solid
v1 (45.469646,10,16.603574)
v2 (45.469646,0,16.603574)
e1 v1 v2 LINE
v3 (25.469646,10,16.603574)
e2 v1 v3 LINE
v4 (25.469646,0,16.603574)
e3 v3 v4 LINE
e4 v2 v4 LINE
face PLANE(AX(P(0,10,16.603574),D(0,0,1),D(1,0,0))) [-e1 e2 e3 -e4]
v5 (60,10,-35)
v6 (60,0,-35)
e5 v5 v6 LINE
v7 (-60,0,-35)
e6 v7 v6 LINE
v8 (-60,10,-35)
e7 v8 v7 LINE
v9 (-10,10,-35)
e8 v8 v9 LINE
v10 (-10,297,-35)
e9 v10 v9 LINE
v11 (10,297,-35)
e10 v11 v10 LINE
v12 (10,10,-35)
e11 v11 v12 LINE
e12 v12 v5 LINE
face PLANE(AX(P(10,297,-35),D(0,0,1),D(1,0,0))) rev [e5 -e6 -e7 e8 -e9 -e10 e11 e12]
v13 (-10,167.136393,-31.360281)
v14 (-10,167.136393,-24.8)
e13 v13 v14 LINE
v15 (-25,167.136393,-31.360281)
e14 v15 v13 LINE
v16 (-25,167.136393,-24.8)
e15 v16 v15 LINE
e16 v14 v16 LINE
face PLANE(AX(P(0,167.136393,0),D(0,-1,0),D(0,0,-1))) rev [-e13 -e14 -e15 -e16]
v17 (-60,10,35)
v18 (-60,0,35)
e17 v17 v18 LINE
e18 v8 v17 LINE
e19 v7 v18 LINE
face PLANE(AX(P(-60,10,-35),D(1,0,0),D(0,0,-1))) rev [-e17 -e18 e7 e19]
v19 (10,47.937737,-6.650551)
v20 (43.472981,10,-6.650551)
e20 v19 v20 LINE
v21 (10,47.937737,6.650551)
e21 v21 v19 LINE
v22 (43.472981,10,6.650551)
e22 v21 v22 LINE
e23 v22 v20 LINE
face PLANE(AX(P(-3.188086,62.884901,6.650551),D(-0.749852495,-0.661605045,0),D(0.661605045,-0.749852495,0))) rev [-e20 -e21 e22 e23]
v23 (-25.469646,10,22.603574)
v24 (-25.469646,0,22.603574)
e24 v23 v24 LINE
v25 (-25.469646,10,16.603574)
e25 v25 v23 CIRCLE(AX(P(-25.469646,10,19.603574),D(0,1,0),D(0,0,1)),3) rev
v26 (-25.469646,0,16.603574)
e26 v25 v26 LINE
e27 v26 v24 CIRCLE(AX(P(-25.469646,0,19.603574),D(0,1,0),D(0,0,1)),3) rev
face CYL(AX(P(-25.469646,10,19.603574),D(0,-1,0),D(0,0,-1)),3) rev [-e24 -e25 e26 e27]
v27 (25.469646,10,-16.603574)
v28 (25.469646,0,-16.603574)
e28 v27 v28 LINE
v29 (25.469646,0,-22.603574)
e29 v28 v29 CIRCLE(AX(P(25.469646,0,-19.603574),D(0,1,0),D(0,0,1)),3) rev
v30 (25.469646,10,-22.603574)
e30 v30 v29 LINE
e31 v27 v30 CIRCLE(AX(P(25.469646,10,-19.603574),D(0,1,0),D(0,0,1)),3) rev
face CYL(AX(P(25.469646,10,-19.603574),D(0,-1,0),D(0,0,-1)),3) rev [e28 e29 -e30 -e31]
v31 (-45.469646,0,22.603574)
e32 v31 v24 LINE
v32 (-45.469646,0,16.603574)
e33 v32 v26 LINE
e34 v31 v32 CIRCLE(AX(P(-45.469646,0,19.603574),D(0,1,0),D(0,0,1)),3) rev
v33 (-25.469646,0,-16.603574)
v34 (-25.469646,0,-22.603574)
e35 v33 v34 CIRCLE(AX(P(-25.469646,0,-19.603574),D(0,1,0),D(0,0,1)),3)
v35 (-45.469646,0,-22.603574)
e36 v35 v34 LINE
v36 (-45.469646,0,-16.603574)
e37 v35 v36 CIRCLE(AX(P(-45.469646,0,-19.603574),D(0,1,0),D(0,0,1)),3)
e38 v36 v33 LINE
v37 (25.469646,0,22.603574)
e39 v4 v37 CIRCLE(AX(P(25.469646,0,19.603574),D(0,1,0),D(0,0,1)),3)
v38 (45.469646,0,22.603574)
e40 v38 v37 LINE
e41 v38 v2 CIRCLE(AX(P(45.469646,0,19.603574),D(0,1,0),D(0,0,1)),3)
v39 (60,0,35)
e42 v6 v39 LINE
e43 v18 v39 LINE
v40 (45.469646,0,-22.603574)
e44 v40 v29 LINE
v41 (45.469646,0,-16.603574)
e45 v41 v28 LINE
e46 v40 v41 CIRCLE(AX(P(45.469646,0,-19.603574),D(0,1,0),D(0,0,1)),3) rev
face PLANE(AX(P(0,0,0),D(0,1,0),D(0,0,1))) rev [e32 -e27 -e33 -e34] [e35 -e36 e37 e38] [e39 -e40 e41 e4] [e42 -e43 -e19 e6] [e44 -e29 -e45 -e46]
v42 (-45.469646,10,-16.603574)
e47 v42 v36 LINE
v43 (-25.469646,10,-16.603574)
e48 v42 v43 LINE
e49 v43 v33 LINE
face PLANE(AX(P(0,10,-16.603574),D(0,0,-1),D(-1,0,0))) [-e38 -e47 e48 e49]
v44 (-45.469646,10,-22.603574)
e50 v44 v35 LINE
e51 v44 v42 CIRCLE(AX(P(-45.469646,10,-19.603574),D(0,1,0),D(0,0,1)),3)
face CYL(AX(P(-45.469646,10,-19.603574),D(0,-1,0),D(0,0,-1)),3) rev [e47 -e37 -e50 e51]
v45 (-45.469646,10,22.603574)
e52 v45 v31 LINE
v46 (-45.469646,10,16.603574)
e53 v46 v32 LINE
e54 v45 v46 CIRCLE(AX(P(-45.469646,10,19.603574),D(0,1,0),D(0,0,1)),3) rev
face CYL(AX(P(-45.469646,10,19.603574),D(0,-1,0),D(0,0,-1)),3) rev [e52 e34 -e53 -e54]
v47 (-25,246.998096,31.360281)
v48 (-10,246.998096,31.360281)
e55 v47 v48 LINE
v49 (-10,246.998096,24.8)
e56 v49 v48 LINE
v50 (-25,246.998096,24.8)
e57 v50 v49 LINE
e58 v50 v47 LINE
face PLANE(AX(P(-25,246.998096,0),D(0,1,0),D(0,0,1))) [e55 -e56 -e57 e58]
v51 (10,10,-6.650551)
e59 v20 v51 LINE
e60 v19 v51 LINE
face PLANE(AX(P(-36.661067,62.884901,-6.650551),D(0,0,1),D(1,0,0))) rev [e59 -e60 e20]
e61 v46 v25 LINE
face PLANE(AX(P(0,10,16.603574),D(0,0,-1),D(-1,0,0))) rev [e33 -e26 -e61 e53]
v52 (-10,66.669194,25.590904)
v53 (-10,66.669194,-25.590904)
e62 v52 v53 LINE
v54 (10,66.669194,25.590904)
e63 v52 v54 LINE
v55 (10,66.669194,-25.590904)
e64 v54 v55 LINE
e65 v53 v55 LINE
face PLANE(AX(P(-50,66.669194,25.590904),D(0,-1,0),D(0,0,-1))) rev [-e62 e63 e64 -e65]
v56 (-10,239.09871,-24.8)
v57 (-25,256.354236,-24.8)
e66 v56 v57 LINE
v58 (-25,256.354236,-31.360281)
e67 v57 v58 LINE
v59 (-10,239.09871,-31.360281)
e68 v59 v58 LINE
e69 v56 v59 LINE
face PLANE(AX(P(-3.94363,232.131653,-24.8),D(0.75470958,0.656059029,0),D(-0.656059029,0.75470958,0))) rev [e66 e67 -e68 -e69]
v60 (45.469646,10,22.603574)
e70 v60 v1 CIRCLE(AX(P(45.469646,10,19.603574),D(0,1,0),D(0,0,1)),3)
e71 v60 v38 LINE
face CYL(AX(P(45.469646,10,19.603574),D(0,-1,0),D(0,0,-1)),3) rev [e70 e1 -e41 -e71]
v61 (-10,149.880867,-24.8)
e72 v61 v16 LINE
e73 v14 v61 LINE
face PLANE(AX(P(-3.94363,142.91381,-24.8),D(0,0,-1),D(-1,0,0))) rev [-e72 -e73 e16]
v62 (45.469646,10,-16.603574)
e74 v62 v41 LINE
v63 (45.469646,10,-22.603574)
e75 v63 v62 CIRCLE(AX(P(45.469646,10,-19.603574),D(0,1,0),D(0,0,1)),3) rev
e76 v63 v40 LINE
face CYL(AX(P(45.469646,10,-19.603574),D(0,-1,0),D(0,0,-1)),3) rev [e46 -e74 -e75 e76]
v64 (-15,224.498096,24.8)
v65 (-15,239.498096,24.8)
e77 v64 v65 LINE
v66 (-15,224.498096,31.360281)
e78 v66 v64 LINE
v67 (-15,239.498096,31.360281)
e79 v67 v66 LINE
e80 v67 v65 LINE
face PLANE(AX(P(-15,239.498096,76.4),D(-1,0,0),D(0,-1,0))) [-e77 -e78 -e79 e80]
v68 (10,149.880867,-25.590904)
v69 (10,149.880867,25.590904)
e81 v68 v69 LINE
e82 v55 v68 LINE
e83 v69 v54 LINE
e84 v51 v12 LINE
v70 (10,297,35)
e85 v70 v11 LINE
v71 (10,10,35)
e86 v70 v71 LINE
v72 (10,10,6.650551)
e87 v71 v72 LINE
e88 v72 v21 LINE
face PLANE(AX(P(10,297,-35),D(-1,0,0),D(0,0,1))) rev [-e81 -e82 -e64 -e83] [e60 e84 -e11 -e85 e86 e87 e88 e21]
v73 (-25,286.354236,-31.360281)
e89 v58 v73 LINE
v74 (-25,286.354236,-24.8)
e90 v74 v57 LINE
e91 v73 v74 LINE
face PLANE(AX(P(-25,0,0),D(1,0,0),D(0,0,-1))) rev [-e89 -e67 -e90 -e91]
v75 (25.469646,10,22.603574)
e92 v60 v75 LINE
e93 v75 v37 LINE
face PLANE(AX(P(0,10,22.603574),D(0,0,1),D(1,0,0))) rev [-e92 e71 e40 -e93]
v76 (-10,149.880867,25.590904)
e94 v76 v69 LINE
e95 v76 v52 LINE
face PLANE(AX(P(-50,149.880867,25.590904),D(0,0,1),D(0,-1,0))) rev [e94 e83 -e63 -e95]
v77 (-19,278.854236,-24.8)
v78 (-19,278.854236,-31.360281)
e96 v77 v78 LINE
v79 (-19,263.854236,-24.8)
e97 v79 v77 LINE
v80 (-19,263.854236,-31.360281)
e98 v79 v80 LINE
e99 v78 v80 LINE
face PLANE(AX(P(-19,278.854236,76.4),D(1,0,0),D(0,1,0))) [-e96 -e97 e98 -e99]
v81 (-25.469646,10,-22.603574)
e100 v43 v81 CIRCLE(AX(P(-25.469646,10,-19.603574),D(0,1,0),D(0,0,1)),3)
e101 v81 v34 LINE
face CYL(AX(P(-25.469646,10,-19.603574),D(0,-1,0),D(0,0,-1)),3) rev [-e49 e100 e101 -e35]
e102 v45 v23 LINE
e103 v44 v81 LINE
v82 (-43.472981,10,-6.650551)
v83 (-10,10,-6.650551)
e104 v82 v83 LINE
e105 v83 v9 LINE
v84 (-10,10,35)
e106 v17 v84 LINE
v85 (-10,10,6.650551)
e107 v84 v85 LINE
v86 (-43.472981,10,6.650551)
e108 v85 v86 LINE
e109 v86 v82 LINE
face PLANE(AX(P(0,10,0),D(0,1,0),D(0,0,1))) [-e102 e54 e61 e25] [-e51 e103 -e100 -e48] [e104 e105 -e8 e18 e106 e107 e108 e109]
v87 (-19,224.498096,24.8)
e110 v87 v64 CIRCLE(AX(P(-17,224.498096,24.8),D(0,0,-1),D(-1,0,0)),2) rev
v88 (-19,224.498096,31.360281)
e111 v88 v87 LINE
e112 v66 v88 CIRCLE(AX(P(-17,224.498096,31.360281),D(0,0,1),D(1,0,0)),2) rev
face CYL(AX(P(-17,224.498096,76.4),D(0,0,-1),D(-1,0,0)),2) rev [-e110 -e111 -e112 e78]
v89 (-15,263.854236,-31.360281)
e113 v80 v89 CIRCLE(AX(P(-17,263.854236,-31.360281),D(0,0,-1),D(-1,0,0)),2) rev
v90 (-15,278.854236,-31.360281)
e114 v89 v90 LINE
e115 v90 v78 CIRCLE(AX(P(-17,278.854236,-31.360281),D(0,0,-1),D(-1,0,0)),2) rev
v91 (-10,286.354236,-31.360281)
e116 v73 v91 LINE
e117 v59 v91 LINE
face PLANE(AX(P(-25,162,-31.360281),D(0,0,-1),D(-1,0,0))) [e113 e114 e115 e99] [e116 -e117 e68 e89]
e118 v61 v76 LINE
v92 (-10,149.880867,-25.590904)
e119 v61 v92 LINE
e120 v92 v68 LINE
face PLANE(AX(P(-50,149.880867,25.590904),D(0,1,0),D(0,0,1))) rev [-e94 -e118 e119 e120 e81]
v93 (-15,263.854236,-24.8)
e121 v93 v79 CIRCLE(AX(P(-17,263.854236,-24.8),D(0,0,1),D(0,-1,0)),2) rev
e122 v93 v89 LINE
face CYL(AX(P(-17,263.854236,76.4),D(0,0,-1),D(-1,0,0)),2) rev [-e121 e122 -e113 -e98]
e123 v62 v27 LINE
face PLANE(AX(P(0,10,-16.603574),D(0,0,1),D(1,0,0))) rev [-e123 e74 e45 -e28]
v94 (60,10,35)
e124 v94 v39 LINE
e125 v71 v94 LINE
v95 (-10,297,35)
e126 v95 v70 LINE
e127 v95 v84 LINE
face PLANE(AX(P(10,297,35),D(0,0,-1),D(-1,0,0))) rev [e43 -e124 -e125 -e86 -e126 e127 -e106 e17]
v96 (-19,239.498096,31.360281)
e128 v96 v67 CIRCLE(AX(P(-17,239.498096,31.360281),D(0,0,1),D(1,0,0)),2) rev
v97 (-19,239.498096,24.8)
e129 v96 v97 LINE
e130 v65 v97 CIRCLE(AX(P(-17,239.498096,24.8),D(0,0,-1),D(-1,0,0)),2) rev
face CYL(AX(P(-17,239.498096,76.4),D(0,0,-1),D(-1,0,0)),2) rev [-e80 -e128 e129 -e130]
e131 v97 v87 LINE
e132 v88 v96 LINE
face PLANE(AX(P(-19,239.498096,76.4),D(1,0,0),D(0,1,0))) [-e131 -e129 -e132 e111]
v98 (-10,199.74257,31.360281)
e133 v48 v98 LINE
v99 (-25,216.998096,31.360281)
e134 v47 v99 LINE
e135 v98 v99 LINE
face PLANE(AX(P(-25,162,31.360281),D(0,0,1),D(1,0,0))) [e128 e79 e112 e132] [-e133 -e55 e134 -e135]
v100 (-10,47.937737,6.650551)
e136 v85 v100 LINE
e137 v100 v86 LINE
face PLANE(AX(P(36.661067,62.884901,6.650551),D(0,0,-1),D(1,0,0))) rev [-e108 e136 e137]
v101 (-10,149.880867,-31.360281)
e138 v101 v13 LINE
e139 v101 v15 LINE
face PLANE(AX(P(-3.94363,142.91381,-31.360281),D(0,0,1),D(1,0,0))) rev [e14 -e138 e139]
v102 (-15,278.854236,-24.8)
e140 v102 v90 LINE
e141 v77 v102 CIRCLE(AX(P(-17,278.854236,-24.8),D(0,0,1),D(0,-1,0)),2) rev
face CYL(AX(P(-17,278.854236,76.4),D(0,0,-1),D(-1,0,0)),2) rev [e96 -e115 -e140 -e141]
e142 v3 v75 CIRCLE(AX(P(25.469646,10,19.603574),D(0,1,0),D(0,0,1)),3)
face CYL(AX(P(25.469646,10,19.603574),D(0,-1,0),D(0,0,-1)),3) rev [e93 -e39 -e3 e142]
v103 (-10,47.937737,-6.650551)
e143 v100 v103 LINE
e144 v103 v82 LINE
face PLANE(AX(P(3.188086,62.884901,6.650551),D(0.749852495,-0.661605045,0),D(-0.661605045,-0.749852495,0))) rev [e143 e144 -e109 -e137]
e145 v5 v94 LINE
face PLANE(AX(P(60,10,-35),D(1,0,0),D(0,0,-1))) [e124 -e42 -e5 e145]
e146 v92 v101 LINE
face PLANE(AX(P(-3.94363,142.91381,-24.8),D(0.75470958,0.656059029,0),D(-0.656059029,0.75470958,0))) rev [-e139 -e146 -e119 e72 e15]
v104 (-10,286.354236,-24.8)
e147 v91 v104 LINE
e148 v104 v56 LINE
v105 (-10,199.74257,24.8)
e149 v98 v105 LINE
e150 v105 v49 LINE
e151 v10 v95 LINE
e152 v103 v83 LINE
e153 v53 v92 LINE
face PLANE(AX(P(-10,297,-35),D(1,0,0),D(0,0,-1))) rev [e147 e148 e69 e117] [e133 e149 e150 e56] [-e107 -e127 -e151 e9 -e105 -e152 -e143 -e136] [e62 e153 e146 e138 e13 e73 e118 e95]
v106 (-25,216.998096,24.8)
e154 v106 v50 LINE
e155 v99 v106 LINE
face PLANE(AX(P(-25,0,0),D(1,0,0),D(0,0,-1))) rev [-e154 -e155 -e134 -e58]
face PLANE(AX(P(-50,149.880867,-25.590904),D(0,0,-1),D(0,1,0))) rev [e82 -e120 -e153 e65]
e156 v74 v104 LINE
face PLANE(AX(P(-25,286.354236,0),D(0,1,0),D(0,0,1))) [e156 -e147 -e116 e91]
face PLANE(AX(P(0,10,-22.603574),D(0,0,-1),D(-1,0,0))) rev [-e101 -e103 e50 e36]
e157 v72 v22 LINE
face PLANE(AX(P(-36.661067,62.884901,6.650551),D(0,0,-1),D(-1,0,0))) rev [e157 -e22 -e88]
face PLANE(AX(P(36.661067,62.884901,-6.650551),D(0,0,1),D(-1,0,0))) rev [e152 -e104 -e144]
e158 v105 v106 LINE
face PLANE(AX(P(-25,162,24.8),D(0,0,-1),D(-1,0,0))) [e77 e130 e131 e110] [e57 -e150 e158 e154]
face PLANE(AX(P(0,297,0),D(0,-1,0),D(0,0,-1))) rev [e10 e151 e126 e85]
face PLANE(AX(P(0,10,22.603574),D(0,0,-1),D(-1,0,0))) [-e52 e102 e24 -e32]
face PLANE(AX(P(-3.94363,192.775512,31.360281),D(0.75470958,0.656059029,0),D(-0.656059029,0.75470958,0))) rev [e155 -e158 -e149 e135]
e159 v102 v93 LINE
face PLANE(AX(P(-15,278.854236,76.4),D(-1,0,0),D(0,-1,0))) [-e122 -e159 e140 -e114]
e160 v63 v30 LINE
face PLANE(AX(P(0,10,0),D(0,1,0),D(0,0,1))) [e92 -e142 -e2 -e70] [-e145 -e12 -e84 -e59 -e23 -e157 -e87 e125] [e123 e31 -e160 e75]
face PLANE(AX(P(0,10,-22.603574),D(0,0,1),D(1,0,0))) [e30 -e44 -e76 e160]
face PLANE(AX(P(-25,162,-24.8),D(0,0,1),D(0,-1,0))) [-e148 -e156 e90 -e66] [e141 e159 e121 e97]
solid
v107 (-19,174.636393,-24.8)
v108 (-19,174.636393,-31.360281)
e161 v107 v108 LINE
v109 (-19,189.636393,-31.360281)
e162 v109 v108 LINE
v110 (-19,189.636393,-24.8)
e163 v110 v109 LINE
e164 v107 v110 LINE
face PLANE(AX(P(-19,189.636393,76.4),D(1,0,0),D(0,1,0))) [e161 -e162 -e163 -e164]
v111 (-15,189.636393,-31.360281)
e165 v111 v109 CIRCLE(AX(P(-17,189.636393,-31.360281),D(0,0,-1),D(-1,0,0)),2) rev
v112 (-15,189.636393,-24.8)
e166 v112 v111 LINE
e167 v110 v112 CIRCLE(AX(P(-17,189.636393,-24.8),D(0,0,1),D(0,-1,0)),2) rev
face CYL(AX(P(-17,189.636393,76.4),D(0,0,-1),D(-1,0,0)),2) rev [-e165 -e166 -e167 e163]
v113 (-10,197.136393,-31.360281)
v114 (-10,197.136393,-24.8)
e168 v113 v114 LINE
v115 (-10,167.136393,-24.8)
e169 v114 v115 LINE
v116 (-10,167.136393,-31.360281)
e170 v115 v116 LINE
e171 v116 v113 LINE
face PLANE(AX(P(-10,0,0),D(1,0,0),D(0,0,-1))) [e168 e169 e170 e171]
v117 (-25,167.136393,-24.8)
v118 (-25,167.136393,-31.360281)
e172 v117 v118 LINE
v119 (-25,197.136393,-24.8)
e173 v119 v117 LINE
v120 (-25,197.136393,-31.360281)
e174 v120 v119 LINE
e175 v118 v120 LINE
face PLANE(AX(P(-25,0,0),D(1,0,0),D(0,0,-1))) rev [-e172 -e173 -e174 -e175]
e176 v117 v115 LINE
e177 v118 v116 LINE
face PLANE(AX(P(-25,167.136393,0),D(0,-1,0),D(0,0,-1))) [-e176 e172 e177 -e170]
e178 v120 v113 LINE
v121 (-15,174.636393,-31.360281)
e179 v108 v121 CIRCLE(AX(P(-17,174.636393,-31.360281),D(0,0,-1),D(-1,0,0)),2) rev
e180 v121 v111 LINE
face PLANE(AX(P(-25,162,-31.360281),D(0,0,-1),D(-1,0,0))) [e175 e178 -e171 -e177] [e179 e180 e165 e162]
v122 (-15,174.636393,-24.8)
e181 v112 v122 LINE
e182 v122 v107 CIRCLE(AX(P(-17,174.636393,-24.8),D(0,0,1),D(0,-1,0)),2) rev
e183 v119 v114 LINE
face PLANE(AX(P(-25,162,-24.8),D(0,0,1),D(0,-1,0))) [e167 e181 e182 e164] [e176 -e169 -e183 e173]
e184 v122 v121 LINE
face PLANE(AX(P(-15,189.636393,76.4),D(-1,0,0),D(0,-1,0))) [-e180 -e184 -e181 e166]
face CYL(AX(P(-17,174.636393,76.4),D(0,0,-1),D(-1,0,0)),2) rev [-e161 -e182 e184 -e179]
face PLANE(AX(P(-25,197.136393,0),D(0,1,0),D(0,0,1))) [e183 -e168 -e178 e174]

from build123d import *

# Parameters (mm, degrees)
SKETCH1_W               = 120
SKETCH1_H               = 70
BOSS_EXTRUDE1_DEPTH     = 10
SKETCH1_3_W             = 20
SKETCH1_3_H             = 70
BOSS_EXTRUDE2_DEPTH     = 162
BOSS_EXTRUDE3_START     = -20
SKETCH2_W               = 6.560281302
SKETCH2_H               = 30
BOSS_EXTRUDE3_DEPTH     = 15
BOSS_EXTRUDE3_2_DEPTH   = 15
BOSS_EXTRUDE3_3_DEPTH   = 15
CUT_EXTRUDE3_DEPTH      = 101.2
CUT_EXTRUDE3_DEPTH_BACK = 127.2
SKETCH7_W               = 20
SKETCH7_H               = 70
BOSS_EXTRUDE4_DEPTH     = 135
SKETCH12_W              = 15
SKETCH12_H              = 6.560281302
BOSS_EXTRUDE6_DEPTH     = 26.31701322
BOSS_EXTRUDE7_START     = -31.360281302
BOSS_EXTRUDE7_DEPTH     = 6.560281302
BOSS_EXTRUDE8_START     = -31.360281302
BOSS_EXTRUDE8_DEPTH     = 6.560281302
SKETCH3_W               = 51.18180782
SKETCH3_H               = 83.211673014
CUT_EXTRUDE1_DEPTH      = 60
BOSS_EXTRUDE9_START     = -6.650550524
BOSS_EXTRUDE9_DEPTH     = 13.301101048


# Read off the part's stored shape, not the designer's step: Boss-Extrude7, Boss-Extrude8, Boss-Extrude9
with BuildPart() as part:
    # Sketch1 → Boss-Extrude1 (new body)
    with BuildSketch(Plane(origin=(0, 0, 0), x_dir=(1, 0, 0), z_dir=(0, 1, 0))):
        Rectangle(SKETCH1_W, SKETCH1_H)
        with BuildLine():
            Line((-45.469645663, 22.603573917), (-25.469645663, 22.603573917))
            ThreePointArc((-25.469645663, 22.603573917), (-22.469645663, 19.603573917), (-25.469645663, 16.603573917))
            Line((-25.469645663, 16.603573917), (-45.469645663, 16.603573917))
            ThreePointArc((-45.469645663, 16.603573917), (-48.469645663, 19.603573917), (-45.469645663, 22.603573917))
        make_face(mode=Mode.SUBTRACT)
        with BuildLine():
            Line((45.469645663, 22.603573917), (25.469645663, 22.603573917))
            ThreePointArc((25.469645663, 22.603573917), (22.469645663, 19.603573917), (25.469645663, 16.603573917))
            Line((25.469645663, 16.603573917), (45.469645663, 16.603573917))
            ThreePointArc((45.469645663, 16.603573917), (48.469645663, 19.603573917), (45.469645663, 22.603573917))
        make_face(mode=Mode.SUBTRACT)
        with BuildLine():
            Line((45.469645663, -22.603573917), (25.469645663, -22.603573917))
            ThreePointArc((25.469645663, -22.603573917), (22.469645663, -19.603573917), (25.469645663, -16.603573917))
            Line((25.469645663, -16.603573917), (45.469645663, -16.603573917))
            ThreePointArc((45.469645663, -16.603573917), (48.469645663, -19.603573917), (45.469645663, -22.603573917))
        make_face(mode=Mode.SUBTRACT)
        with BuildLine():
            Line((-45.469645663, -22.603573917), (-25.469645663, -22.603573917))
            ThreePointArc((-25.469645663, -22.603573917), (-22.469645663, -19.603573917), (-25.469645663, -16.603573917))
            Line((-25.469645663, -16.603573917), (-45.469645663, -16.603573917))
            ThreePointArc((-45.469645663, -16.603573917), (-48.469645663, -19.603573917), (-45.469645663, -22.603573917))
        make_face(mode=Mode.SUBTRACT)
    extrude(amount=BOSS_EXTRUDE1_DEPTH)

    # Sketch1<3> → Boss-Extrude2 (add)
    with BuildSketch(Plane(origin=(0, 0, 0), x_dir=(1, 0, 0), z_dir=(0, 1, 0))):
        Rectangle(SKETCH1_3_W, SKETCH1_3_H)
    extrude(amount=BOSS_EXTRUDE2_DEPTH)


with BuildPart() as body_2:
    # Sketch2 → Boss-Extrude3 (new body)
    with BuildSketch(Plane(origin=(10, 0, 0), x_dir=(0, 0, -1), z_dir=(1, 0, 0)).offset(BOSS_EXTRUDE3_START)):
        with Locations((-28.080140651, 231.998095635)):
            Rectangle(SKETCH2_W, SKETCH2_H)
    extrude(amount=-BOSS_EXTRUDE3_DEPTH)


with BuildPart() as body_3:
    # Sketch2 → Boss-Extrude3 2 (new body)
    with BuildSketch(Plane(origin=(10, 0, 0), x_dir=(0, 0, -1), z_dir=(1, 0, 0)).offset(BOSS_EXTRUDE3_START)):
        with Locations((28.080140651, 182.13639327)):
            Rectangle(SKETCH2_W, SKETCH2_H)
    extrude(amount=-BOSS_EXTRUDE3_2_DEPTH)


with BuildPart() as body_4:
    # Sketch2 → Boss-Extrude3 3 (new body)
    with BuildSketch(Plane(origin=(10, 0, 0), x_dir=(0, 0, -1), z_dir=(1, 0, 0)).offset(BOSS_EXTRUDE3_START)):
        with Locations((28.080140651, 271.354236176)):
            Rectangle(SKETCH2_W, SKETCH2_H)
    extrude(amount=-BOSS_EXTRUDE3_3_DEPTH)


with BuildPart() as cut_extrude3_tool:
    # Sketch5 → Cut-Extrude3 (new, two sides: drawn at the far end of the back side and taken through both)
    with BuildSketch(Plane.XY.offset(-24.8).offset(-CUT_EXTRUDE3_DEPTH_BACK)):
        with BuildLine():
            Line((-15, 239.498095635), (-15, 224.498095635))
            ThreePointArc((-15, 224.498095635), (-17, 222.498095635), (-19, 224.498095635))
            Line((-19, 224.498095635), (-19, 239.498095635))
            ThreePointArc((-19, 239.498095635), (-17, 241.498095635), (-15, 239.498095635))
        make_face()
        with BuildLine():
            Line((-15, 189.63639327), (-15, 174.63639327))
            ThreePointArc((-15, 174.63639327), (-17, 172.63639327), (-19, 174.63639327))
            Line((-19, 174.63639327), (-19, 189.63639327))
            ThreePointArc((-19, 189.63639327), (-17, 191.63639327), (-15, 189.63639327))
        make_face()
        with BuildLine():
            Line((-15, 278.854236176), (-15, 263.854236176))
            ThreePointArc((-15, 263.854236176), (-17, 261.854236176), (-19, 263.854236176))
            Line((-19, 263.854236176), (-19, 278.854236176))
            ThreePointArc((-19, 278.854236176), (-17, 280.854236176), (-15, 278.854236176))
        make_face()
    extrude(amount=CUT_EXTRUDE3_DEPTH + CUT_EXTRUDE3_DEPTH_BACK)


with BuildPart() as body_2_1:
    add(body_2.part)

    # Cut-Extrude3: cut by cut_extrude3_tool
    add(cut_extrude3_tool.part, mode=Mode.SUBTRACT)



with BuildPart() as body_3_1:
    add(body_3.part)

    # Cut-Extrude3: cut by cut_extrude3_tool
    add(cut_extrude3_tool.part, mode=Mode.SUBTRACT)


with BuildPart() as body_4_1:
    add(body_4.part)

    # Cut-Extrude3: cut by cut_extrude3_tool
    add(cut_extrude3_tool.part, mode=Mode.SUBTRACT)


with BuildPart() as body_2_2:
    add(body_2_1.part)

    add(body_4_1.part)  # Boss-Extrude4 merges body 4

    add(part.part)  # Boss-Extrude4 merges part
    # Sketch7 → Boss-Extrude4 (add)
    with BuildSketch(Plane(origin=(0, 162, 0), x_dir=(1, 0, 0), z_dir=(0, 1, 0))):
        Rectangle(SKETCH7_W, SKETCH7_H)
    extrude(amount=BOSS_EXTRUDE4_DEPTH)

    # Sketch12 → Boss-Extrude6 (add, along a direction that is not the sketch's normal)
    with BuildSketch(Plane.XZ.offset(-216.998095635)):
        with Locations((-17.5, 28.080140651)):
            Rectangle(SKETCH12_W, SKETCH12_H)
    extrude(amount=BOSS_EXTRUDE6_DEPTH, dir=(0.6560590289905114, -0.7547095802227685, 0))

    # Boss-Extrude7 outline → Boss-Extrude7 (add)
    with BuildSketch(Plane.XY.offset(BOSS_EXTRUDE7_START)):
        Polygon((-25, 256.354236176), (-10, 239.098710067), (-10, 256.354236176), align=None)
    extrude(amount=BOSS_EXTRUDE7_DEPTH)

    # Boss-Extrude8 outline → Boss-Extrude8 (add)
    with BuildSketch(Plane.XY.offset(BOSS_EXTRUDE8_START)):
        Polygon((-10, 167.13639327), (-25, 167.13639327), (-10, 149.880867162), align=None)
    extrude(amount=BOSS_EXTRUDE8_DEPTH)

    # Sketch3 → Cut-Extrude1 (cut)
    with BuildSketch(Plane(origin=(10, 0, 0), x_dir=(0, 0, -1), z_dir=(1, 0, 0))):
        with Locations((0, 108.275030655)):
            Rectangle(SKETCH3_W, SKETCH3_H)
    extrude(amount=-CUT_EXTRUDE1_DEPTH, mode=Mode.SUBTRACT)

    # Boss-Extrude9 outline → Boss-Extrude9 (add)
    with BuildSketch(Plane.XY.offset(BOSS_EXTRUDE9_START)):
        Polygon((43.472980585, 10), (10, 47.93773671), (10, 10), align=None)
    boss_extrude9 = extrude(amount=BOSS_EXTRUDE9_DEPTH)

    # Mirror1: Boss-Extrude9 across plane
    add(boss_extrude9.mirror(Plane(origin=(0, 0, 0), x_dir=(0, 0, 1), z_dir=(1, 0, 0))))


solid = Compound([body_3_1.part, body_2_2.part])
